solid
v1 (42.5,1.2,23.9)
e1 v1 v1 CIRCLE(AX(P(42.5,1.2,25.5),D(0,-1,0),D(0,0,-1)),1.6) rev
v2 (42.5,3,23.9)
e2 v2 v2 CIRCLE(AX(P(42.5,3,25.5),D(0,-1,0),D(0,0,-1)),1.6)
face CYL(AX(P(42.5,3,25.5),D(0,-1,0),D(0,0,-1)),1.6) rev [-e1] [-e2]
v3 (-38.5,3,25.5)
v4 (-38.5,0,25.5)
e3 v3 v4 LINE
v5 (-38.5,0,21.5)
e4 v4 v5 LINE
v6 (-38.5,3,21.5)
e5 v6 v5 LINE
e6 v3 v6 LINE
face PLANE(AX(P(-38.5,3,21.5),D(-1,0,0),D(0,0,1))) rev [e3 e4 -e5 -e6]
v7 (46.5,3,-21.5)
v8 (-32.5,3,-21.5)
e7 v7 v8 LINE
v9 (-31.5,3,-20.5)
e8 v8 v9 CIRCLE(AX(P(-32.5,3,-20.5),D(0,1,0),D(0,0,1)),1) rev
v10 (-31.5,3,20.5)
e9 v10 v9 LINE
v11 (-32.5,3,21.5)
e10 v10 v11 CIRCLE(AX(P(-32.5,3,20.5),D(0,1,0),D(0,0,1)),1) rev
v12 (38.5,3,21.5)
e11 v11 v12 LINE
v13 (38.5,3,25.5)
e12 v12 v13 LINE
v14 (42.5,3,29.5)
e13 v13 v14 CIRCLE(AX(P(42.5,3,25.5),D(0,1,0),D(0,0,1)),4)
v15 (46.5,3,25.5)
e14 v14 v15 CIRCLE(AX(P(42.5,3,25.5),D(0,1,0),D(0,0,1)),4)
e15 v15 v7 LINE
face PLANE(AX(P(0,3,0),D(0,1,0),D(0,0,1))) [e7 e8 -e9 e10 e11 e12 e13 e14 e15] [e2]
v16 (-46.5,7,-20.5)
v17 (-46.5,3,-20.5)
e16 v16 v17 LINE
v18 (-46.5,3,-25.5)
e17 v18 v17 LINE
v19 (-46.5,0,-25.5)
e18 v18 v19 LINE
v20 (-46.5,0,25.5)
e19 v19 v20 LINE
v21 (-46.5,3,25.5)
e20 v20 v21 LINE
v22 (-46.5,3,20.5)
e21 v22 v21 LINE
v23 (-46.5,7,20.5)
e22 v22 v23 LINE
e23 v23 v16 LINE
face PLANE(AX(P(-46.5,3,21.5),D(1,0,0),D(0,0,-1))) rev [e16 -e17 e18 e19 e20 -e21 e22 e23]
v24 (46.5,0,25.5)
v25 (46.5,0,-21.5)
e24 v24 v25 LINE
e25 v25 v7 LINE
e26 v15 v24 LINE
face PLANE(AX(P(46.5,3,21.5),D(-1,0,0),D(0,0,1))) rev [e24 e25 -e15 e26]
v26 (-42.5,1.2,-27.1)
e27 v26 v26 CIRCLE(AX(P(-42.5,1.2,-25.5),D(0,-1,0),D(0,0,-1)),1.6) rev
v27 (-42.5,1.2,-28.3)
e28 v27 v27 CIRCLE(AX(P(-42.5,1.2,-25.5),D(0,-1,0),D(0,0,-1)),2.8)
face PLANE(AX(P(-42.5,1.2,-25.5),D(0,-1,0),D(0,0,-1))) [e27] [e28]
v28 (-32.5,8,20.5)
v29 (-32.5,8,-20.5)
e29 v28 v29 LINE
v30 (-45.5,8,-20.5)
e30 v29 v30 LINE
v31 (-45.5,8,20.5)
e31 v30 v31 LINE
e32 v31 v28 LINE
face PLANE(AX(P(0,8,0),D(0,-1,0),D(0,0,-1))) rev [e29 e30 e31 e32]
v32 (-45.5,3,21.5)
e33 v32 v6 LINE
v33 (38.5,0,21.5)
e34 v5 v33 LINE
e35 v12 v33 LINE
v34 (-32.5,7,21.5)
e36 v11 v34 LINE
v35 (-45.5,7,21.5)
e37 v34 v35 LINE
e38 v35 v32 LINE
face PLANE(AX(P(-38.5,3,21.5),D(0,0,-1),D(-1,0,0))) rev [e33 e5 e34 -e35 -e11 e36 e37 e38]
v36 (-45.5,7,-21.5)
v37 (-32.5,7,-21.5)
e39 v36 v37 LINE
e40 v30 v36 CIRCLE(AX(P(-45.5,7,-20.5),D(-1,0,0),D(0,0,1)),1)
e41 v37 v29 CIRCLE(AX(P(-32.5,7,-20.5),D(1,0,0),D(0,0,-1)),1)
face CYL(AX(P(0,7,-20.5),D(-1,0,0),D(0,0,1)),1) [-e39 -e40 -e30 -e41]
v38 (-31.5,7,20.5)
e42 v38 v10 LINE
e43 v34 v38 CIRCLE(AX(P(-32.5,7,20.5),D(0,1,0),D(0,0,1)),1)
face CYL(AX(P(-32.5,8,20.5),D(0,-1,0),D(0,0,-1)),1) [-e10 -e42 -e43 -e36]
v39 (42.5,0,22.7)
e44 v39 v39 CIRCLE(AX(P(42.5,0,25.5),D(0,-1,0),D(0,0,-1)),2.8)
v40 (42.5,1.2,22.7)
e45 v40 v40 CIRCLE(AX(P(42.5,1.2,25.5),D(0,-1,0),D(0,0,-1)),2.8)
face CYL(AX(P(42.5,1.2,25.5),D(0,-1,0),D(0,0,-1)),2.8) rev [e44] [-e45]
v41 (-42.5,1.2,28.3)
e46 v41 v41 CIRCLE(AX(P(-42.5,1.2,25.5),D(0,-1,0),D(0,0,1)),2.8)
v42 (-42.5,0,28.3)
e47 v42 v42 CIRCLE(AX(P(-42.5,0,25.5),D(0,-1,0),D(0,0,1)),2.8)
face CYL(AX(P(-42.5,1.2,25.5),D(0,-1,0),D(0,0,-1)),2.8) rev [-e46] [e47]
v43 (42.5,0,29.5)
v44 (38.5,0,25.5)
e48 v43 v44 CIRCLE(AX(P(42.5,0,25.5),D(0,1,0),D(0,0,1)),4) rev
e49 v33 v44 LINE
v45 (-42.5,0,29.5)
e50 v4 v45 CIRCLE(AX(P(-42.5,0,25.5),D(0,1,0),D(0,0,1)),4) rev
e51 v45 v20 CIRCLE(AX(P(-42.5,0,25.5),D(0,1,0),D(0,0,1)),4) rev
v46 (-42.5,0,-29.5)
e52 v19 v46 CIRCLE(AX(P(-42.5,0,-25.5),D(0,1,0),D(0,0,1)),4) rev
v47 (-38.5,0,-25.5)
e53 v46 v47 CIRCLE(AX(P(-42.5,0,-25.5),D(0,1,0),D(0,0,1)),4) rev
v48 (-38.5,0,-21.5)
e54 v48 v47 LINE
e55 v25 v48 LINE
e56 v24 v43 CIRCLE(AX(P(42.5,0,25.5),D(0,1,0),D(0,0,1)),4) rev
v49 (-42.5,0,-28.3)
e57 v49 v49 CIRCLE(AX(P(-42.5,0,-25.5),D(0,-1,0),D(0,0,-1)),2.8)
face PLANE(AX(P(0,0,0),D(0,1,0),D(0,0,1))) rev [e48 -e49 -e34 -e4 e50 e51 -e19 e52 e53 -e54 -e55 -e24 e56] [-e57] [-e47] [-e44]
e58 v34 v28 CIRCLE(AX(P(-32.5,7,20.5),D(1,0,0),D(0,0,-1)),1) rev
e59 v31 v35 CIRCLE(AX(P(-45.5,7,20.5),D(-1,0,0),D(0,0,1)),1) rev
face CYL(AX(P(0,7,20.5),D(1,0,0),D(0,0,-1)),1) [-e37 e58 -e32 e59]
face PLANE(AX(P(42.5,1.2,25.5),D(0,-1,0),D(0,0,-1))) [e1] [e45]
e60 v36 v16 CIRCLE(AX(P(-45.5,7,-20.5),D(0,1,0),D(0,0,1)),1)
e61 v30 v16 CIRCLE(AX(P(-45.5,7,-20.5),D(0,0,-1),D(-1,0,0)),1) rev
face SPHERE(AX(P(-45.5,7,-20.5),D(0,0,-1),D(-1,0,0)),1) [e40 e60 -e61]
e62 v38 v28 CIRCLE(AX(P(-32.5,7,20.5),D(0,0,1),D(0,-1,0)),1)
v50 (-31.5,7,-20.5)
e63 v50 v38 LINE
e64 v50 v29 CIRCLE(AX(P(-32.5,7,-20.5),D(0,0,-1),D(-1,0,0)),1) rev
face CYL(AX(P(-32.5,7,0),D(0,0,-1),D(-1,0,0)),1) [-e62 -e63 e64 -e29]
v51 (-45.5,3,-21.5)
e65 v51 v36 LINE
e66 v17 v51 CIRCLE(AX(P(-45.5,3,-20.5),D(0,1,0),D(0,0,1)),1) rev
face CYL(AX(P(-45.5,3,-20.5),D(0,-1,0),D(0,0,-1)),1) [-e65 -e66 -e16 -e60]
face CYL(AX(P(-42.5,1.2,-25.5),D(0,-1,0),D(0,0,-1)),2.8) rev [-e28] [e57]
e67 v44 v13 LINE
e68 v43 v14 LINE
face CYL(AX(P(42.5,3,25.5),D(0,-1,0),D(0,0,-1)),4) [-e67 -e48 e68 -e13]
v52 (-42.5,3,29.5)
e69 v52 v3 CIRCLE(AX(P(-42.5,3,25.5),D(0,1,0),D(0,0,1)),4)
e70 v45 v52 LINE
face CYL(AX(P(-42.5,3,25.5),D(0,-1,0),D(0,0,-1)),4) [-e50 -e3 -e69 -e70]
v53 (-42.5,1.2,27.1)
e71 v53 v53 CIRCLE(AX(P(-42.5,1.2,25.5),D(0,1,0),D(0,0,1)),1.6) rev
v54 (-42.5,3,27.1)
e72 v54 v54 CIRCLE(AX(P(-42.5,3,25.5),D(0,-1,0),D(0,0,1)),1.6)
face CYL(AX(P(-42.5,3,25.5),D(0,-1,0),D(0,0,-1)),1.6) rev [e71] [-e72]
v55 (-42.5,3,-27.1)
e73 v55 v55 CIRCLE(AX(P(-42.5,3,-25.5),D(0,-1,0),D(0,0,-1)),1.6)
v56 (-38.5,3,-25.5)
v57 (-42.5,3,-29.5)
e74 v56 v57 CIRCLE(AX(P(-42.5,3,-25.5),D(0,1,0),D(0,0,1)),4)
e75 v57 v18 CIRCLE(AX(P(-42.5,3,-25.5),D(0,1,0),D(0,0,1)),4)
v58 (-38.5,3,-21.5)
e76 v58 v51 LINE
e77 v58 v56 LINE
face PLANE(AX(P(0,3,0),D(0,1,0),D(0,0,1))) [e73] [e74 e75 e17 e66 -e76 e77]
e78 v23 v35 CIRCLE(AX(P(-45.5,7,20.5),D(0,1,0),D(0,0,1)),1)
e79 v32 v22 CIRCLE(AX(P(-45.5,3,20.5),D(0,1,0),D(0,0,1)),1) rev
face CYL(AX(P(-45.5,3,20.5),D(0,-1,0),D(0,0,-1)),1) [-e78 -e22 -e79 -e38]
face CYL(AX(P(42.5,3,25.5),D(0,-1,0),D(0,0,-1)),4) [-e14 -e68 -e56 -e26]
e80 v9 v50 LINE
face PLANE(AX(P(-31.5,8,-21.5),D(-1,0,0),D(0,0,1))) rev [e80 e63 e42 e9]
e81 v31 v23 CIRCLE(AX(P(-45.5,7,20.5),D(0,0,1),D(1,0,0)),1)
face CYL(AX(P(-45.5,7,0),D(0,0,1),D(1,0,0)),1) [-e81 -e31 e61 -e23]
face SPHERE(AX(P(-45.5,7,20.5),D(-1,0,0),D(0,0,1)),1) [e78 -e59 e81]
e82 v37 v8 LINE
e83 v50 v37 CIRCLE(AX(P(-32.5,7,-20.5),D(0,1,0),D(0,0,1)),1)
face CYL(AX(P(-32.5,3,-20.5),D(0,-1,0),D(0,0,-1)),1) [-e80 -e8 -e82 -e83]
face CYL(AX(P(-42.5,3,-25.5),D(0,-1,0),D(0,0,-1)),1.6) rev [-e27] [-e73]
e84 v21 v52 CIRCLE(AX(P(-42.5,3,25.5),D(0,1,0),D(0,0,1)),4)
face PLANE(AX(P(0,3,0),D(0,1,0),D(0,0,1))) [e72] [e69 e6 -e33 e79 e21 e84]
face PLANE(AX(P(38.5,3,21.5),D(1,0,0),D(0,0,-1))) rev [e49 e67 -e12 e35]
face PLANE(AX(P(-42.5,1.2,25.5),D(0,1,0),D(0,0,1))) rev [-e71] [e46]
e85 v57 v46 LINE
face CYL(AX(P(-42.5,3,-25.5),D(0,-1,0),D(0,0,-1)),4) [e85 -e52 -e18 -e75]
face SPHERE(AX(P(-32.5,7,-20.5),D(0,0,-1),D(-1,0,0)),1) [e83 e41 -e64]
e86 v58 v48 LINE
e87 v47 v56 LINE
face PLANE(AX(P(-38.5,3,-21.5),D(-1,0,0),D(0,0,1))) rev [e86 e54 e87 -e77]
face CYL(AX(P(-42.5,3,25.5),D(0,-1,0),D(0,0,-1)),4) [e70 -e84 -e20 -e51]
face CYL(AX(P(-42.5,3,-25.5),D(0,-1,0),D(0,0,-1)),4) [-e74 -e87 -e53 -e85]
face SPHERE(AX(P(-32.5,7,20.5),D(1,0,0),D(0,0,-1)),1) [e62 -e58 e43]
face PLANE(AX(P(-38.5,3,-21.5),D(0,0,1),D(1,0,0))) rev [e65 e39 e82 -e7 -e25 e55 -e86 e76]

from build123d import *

# Parameters (mm, degrees)
EXTRUDE_1_DEPTH     = 3
FILLET_1_R          = 4
SKETCH_2_R          = 1.6
CUT_EXTRUDE_1_DEPTH = 3
SKETCH_3_R          = 2.8
CUT_EXTRUDE_2_DEPTH = 1.2
SKETCH_4_W          = 15
SKETCH_4_H          = 43
EXTRUDE_2_DEPTH     = 5
FILLET_2_R          = 1
SKETCH_5_W          = 21.917819233
SKETCH_5_H          = 11.553011577
CUT_EXTRUDE_3_DEPTH = 10


with BuildPart() as part:
    # 草图1 → 凸台-拉伸1 (new body)
    with BuildSketch(Plane(origin=(0, 0, 0), x_dir=(1, 0, 0), z_dir=(0, 1, 0))):
        Polygon((-38.5, -21.5), (38.5, -21.5), (38.5, -29.5), (46.5, -29.5), (46.5, -21.5), (46.5, 21.5), (46.5, 29.5), (38.5, 29.5), (38.5, 21.5), (-38.5, 21.5), (-38.5, 29.5), (-46.5, 29.5), (-46.5, 21.5), (-46.5, -21.5), (-46.5, -29.5), (-38.5, -29.5), align=None)
    extrude(amount=EXTRUDE_1_DEPTH)

    # 圆角1
    fillet_1_edges = [part.edges().sort_by_distance(p)[0] for p in [
        (38.5, 1.5, 29.5),
        (46.5, 1.5, 29.5),
        (-46.5, 1.5, 29.5),
        (-38.5, 1.5, 29.5),
        (-46.5, 1.5, -29.5),
        (-38.5, 1.5, -29.5),
        (38.5, 1.5, -29.5),
        (46.5, 1.5, -29.5),
    ]]
    fillet(fillet_1_edges, radius=FILLET_1_R - 0.0001)  # a hair under: the kernel refuses the full size

    # 草图2 → 切除-拉伸1 (cut)
    with BuildSketch(Plane.XZ):
        with Locations(Location((42.5, 25.5, 0), (0, 0, 270))):
            Circle(SKETCH_2_R)
        with Locations(Location((42.5, -25.5, 0), (0, 0, 90))):
            Circle(SKETCH_2_R)
        with Locations(Location((-42.5, -25.5, 0), (0, 0, 270))):
            Circle(SKETCH_2_R)
        with Locations(Location((-42.5, 25.5, 0), (0, 0, 90))):
            Circle(SKETCH_2_R)
    extrude(amount=-CUT_EXTRUDE_1_DEPTH, mode=Mode.SUBTRACT)

    # 草图3 → 切除-拉伸2 (cut)
    with BuildSketch(Plane.XZ):
        with Locations(Location((-42.5, 25.5, 0), (0, 0, 90))):
            Circle(SKETCH_3_R)
        with Locations(Location((42.5, 25.5, 0), (0, 0, 270))):
            Circle(SKETCH_3_R)
        with Locations(Location((42.5, -25.5, 0), (0, 0, 90))):
            Circle(SKETCH_3_R)
        with Locations(Location((-42.5, -25.5, 0), (0, 0, 270))):
            Circle(SKETCH_3_R)
    extrude(amount=-CUT_EXTRUDE_2_DEPTH, mode=Mode.SUBTRACT)

    # 草图4 → 凸台-拉伸2 (add)
    with BuildSketch(Plane(origin=(0, 3, 0), x_dir=(1, 0, 0), z_dir=(0, 1, 0))):
        with Locations((-39, 0)):
            Rectangle(SKETCH_4_W, SKETCH_4_H)
    extrude(amount=EXTRUDE_2_DEPTH)

    # 圆角2
    fillet_2_edges = [part.edges().sort_by_distance(p)[0] for p in [
        (-31.5, 5.5, 21.5),
        (-31.5, 5.5, -21.5),
        (-46.5, 5.5, -21.5),
        (-46.5, 5.5, 21.5),
        (-31.5, 8, 0),
        (-39, 8, -21.5),
        (-46.5, 8, 0),
        (-39, 8, 21.5),
    ]]
    fillet(fillet_2_edges, radius=FILLET_2_R)

    # 草图5 → 切除-拉伸3 (cut)
    with BuildSketch(Plane.XZ):
        with Locations((42.014050272, -27.276505788)):
            Rectangle(SKETCH_5_W, SKETCH_5_H)
    extrude(amount=-CUT_EXTRUDE_3_DEPTH, mode=Mode.SUBTRACT)


solid = part.part
